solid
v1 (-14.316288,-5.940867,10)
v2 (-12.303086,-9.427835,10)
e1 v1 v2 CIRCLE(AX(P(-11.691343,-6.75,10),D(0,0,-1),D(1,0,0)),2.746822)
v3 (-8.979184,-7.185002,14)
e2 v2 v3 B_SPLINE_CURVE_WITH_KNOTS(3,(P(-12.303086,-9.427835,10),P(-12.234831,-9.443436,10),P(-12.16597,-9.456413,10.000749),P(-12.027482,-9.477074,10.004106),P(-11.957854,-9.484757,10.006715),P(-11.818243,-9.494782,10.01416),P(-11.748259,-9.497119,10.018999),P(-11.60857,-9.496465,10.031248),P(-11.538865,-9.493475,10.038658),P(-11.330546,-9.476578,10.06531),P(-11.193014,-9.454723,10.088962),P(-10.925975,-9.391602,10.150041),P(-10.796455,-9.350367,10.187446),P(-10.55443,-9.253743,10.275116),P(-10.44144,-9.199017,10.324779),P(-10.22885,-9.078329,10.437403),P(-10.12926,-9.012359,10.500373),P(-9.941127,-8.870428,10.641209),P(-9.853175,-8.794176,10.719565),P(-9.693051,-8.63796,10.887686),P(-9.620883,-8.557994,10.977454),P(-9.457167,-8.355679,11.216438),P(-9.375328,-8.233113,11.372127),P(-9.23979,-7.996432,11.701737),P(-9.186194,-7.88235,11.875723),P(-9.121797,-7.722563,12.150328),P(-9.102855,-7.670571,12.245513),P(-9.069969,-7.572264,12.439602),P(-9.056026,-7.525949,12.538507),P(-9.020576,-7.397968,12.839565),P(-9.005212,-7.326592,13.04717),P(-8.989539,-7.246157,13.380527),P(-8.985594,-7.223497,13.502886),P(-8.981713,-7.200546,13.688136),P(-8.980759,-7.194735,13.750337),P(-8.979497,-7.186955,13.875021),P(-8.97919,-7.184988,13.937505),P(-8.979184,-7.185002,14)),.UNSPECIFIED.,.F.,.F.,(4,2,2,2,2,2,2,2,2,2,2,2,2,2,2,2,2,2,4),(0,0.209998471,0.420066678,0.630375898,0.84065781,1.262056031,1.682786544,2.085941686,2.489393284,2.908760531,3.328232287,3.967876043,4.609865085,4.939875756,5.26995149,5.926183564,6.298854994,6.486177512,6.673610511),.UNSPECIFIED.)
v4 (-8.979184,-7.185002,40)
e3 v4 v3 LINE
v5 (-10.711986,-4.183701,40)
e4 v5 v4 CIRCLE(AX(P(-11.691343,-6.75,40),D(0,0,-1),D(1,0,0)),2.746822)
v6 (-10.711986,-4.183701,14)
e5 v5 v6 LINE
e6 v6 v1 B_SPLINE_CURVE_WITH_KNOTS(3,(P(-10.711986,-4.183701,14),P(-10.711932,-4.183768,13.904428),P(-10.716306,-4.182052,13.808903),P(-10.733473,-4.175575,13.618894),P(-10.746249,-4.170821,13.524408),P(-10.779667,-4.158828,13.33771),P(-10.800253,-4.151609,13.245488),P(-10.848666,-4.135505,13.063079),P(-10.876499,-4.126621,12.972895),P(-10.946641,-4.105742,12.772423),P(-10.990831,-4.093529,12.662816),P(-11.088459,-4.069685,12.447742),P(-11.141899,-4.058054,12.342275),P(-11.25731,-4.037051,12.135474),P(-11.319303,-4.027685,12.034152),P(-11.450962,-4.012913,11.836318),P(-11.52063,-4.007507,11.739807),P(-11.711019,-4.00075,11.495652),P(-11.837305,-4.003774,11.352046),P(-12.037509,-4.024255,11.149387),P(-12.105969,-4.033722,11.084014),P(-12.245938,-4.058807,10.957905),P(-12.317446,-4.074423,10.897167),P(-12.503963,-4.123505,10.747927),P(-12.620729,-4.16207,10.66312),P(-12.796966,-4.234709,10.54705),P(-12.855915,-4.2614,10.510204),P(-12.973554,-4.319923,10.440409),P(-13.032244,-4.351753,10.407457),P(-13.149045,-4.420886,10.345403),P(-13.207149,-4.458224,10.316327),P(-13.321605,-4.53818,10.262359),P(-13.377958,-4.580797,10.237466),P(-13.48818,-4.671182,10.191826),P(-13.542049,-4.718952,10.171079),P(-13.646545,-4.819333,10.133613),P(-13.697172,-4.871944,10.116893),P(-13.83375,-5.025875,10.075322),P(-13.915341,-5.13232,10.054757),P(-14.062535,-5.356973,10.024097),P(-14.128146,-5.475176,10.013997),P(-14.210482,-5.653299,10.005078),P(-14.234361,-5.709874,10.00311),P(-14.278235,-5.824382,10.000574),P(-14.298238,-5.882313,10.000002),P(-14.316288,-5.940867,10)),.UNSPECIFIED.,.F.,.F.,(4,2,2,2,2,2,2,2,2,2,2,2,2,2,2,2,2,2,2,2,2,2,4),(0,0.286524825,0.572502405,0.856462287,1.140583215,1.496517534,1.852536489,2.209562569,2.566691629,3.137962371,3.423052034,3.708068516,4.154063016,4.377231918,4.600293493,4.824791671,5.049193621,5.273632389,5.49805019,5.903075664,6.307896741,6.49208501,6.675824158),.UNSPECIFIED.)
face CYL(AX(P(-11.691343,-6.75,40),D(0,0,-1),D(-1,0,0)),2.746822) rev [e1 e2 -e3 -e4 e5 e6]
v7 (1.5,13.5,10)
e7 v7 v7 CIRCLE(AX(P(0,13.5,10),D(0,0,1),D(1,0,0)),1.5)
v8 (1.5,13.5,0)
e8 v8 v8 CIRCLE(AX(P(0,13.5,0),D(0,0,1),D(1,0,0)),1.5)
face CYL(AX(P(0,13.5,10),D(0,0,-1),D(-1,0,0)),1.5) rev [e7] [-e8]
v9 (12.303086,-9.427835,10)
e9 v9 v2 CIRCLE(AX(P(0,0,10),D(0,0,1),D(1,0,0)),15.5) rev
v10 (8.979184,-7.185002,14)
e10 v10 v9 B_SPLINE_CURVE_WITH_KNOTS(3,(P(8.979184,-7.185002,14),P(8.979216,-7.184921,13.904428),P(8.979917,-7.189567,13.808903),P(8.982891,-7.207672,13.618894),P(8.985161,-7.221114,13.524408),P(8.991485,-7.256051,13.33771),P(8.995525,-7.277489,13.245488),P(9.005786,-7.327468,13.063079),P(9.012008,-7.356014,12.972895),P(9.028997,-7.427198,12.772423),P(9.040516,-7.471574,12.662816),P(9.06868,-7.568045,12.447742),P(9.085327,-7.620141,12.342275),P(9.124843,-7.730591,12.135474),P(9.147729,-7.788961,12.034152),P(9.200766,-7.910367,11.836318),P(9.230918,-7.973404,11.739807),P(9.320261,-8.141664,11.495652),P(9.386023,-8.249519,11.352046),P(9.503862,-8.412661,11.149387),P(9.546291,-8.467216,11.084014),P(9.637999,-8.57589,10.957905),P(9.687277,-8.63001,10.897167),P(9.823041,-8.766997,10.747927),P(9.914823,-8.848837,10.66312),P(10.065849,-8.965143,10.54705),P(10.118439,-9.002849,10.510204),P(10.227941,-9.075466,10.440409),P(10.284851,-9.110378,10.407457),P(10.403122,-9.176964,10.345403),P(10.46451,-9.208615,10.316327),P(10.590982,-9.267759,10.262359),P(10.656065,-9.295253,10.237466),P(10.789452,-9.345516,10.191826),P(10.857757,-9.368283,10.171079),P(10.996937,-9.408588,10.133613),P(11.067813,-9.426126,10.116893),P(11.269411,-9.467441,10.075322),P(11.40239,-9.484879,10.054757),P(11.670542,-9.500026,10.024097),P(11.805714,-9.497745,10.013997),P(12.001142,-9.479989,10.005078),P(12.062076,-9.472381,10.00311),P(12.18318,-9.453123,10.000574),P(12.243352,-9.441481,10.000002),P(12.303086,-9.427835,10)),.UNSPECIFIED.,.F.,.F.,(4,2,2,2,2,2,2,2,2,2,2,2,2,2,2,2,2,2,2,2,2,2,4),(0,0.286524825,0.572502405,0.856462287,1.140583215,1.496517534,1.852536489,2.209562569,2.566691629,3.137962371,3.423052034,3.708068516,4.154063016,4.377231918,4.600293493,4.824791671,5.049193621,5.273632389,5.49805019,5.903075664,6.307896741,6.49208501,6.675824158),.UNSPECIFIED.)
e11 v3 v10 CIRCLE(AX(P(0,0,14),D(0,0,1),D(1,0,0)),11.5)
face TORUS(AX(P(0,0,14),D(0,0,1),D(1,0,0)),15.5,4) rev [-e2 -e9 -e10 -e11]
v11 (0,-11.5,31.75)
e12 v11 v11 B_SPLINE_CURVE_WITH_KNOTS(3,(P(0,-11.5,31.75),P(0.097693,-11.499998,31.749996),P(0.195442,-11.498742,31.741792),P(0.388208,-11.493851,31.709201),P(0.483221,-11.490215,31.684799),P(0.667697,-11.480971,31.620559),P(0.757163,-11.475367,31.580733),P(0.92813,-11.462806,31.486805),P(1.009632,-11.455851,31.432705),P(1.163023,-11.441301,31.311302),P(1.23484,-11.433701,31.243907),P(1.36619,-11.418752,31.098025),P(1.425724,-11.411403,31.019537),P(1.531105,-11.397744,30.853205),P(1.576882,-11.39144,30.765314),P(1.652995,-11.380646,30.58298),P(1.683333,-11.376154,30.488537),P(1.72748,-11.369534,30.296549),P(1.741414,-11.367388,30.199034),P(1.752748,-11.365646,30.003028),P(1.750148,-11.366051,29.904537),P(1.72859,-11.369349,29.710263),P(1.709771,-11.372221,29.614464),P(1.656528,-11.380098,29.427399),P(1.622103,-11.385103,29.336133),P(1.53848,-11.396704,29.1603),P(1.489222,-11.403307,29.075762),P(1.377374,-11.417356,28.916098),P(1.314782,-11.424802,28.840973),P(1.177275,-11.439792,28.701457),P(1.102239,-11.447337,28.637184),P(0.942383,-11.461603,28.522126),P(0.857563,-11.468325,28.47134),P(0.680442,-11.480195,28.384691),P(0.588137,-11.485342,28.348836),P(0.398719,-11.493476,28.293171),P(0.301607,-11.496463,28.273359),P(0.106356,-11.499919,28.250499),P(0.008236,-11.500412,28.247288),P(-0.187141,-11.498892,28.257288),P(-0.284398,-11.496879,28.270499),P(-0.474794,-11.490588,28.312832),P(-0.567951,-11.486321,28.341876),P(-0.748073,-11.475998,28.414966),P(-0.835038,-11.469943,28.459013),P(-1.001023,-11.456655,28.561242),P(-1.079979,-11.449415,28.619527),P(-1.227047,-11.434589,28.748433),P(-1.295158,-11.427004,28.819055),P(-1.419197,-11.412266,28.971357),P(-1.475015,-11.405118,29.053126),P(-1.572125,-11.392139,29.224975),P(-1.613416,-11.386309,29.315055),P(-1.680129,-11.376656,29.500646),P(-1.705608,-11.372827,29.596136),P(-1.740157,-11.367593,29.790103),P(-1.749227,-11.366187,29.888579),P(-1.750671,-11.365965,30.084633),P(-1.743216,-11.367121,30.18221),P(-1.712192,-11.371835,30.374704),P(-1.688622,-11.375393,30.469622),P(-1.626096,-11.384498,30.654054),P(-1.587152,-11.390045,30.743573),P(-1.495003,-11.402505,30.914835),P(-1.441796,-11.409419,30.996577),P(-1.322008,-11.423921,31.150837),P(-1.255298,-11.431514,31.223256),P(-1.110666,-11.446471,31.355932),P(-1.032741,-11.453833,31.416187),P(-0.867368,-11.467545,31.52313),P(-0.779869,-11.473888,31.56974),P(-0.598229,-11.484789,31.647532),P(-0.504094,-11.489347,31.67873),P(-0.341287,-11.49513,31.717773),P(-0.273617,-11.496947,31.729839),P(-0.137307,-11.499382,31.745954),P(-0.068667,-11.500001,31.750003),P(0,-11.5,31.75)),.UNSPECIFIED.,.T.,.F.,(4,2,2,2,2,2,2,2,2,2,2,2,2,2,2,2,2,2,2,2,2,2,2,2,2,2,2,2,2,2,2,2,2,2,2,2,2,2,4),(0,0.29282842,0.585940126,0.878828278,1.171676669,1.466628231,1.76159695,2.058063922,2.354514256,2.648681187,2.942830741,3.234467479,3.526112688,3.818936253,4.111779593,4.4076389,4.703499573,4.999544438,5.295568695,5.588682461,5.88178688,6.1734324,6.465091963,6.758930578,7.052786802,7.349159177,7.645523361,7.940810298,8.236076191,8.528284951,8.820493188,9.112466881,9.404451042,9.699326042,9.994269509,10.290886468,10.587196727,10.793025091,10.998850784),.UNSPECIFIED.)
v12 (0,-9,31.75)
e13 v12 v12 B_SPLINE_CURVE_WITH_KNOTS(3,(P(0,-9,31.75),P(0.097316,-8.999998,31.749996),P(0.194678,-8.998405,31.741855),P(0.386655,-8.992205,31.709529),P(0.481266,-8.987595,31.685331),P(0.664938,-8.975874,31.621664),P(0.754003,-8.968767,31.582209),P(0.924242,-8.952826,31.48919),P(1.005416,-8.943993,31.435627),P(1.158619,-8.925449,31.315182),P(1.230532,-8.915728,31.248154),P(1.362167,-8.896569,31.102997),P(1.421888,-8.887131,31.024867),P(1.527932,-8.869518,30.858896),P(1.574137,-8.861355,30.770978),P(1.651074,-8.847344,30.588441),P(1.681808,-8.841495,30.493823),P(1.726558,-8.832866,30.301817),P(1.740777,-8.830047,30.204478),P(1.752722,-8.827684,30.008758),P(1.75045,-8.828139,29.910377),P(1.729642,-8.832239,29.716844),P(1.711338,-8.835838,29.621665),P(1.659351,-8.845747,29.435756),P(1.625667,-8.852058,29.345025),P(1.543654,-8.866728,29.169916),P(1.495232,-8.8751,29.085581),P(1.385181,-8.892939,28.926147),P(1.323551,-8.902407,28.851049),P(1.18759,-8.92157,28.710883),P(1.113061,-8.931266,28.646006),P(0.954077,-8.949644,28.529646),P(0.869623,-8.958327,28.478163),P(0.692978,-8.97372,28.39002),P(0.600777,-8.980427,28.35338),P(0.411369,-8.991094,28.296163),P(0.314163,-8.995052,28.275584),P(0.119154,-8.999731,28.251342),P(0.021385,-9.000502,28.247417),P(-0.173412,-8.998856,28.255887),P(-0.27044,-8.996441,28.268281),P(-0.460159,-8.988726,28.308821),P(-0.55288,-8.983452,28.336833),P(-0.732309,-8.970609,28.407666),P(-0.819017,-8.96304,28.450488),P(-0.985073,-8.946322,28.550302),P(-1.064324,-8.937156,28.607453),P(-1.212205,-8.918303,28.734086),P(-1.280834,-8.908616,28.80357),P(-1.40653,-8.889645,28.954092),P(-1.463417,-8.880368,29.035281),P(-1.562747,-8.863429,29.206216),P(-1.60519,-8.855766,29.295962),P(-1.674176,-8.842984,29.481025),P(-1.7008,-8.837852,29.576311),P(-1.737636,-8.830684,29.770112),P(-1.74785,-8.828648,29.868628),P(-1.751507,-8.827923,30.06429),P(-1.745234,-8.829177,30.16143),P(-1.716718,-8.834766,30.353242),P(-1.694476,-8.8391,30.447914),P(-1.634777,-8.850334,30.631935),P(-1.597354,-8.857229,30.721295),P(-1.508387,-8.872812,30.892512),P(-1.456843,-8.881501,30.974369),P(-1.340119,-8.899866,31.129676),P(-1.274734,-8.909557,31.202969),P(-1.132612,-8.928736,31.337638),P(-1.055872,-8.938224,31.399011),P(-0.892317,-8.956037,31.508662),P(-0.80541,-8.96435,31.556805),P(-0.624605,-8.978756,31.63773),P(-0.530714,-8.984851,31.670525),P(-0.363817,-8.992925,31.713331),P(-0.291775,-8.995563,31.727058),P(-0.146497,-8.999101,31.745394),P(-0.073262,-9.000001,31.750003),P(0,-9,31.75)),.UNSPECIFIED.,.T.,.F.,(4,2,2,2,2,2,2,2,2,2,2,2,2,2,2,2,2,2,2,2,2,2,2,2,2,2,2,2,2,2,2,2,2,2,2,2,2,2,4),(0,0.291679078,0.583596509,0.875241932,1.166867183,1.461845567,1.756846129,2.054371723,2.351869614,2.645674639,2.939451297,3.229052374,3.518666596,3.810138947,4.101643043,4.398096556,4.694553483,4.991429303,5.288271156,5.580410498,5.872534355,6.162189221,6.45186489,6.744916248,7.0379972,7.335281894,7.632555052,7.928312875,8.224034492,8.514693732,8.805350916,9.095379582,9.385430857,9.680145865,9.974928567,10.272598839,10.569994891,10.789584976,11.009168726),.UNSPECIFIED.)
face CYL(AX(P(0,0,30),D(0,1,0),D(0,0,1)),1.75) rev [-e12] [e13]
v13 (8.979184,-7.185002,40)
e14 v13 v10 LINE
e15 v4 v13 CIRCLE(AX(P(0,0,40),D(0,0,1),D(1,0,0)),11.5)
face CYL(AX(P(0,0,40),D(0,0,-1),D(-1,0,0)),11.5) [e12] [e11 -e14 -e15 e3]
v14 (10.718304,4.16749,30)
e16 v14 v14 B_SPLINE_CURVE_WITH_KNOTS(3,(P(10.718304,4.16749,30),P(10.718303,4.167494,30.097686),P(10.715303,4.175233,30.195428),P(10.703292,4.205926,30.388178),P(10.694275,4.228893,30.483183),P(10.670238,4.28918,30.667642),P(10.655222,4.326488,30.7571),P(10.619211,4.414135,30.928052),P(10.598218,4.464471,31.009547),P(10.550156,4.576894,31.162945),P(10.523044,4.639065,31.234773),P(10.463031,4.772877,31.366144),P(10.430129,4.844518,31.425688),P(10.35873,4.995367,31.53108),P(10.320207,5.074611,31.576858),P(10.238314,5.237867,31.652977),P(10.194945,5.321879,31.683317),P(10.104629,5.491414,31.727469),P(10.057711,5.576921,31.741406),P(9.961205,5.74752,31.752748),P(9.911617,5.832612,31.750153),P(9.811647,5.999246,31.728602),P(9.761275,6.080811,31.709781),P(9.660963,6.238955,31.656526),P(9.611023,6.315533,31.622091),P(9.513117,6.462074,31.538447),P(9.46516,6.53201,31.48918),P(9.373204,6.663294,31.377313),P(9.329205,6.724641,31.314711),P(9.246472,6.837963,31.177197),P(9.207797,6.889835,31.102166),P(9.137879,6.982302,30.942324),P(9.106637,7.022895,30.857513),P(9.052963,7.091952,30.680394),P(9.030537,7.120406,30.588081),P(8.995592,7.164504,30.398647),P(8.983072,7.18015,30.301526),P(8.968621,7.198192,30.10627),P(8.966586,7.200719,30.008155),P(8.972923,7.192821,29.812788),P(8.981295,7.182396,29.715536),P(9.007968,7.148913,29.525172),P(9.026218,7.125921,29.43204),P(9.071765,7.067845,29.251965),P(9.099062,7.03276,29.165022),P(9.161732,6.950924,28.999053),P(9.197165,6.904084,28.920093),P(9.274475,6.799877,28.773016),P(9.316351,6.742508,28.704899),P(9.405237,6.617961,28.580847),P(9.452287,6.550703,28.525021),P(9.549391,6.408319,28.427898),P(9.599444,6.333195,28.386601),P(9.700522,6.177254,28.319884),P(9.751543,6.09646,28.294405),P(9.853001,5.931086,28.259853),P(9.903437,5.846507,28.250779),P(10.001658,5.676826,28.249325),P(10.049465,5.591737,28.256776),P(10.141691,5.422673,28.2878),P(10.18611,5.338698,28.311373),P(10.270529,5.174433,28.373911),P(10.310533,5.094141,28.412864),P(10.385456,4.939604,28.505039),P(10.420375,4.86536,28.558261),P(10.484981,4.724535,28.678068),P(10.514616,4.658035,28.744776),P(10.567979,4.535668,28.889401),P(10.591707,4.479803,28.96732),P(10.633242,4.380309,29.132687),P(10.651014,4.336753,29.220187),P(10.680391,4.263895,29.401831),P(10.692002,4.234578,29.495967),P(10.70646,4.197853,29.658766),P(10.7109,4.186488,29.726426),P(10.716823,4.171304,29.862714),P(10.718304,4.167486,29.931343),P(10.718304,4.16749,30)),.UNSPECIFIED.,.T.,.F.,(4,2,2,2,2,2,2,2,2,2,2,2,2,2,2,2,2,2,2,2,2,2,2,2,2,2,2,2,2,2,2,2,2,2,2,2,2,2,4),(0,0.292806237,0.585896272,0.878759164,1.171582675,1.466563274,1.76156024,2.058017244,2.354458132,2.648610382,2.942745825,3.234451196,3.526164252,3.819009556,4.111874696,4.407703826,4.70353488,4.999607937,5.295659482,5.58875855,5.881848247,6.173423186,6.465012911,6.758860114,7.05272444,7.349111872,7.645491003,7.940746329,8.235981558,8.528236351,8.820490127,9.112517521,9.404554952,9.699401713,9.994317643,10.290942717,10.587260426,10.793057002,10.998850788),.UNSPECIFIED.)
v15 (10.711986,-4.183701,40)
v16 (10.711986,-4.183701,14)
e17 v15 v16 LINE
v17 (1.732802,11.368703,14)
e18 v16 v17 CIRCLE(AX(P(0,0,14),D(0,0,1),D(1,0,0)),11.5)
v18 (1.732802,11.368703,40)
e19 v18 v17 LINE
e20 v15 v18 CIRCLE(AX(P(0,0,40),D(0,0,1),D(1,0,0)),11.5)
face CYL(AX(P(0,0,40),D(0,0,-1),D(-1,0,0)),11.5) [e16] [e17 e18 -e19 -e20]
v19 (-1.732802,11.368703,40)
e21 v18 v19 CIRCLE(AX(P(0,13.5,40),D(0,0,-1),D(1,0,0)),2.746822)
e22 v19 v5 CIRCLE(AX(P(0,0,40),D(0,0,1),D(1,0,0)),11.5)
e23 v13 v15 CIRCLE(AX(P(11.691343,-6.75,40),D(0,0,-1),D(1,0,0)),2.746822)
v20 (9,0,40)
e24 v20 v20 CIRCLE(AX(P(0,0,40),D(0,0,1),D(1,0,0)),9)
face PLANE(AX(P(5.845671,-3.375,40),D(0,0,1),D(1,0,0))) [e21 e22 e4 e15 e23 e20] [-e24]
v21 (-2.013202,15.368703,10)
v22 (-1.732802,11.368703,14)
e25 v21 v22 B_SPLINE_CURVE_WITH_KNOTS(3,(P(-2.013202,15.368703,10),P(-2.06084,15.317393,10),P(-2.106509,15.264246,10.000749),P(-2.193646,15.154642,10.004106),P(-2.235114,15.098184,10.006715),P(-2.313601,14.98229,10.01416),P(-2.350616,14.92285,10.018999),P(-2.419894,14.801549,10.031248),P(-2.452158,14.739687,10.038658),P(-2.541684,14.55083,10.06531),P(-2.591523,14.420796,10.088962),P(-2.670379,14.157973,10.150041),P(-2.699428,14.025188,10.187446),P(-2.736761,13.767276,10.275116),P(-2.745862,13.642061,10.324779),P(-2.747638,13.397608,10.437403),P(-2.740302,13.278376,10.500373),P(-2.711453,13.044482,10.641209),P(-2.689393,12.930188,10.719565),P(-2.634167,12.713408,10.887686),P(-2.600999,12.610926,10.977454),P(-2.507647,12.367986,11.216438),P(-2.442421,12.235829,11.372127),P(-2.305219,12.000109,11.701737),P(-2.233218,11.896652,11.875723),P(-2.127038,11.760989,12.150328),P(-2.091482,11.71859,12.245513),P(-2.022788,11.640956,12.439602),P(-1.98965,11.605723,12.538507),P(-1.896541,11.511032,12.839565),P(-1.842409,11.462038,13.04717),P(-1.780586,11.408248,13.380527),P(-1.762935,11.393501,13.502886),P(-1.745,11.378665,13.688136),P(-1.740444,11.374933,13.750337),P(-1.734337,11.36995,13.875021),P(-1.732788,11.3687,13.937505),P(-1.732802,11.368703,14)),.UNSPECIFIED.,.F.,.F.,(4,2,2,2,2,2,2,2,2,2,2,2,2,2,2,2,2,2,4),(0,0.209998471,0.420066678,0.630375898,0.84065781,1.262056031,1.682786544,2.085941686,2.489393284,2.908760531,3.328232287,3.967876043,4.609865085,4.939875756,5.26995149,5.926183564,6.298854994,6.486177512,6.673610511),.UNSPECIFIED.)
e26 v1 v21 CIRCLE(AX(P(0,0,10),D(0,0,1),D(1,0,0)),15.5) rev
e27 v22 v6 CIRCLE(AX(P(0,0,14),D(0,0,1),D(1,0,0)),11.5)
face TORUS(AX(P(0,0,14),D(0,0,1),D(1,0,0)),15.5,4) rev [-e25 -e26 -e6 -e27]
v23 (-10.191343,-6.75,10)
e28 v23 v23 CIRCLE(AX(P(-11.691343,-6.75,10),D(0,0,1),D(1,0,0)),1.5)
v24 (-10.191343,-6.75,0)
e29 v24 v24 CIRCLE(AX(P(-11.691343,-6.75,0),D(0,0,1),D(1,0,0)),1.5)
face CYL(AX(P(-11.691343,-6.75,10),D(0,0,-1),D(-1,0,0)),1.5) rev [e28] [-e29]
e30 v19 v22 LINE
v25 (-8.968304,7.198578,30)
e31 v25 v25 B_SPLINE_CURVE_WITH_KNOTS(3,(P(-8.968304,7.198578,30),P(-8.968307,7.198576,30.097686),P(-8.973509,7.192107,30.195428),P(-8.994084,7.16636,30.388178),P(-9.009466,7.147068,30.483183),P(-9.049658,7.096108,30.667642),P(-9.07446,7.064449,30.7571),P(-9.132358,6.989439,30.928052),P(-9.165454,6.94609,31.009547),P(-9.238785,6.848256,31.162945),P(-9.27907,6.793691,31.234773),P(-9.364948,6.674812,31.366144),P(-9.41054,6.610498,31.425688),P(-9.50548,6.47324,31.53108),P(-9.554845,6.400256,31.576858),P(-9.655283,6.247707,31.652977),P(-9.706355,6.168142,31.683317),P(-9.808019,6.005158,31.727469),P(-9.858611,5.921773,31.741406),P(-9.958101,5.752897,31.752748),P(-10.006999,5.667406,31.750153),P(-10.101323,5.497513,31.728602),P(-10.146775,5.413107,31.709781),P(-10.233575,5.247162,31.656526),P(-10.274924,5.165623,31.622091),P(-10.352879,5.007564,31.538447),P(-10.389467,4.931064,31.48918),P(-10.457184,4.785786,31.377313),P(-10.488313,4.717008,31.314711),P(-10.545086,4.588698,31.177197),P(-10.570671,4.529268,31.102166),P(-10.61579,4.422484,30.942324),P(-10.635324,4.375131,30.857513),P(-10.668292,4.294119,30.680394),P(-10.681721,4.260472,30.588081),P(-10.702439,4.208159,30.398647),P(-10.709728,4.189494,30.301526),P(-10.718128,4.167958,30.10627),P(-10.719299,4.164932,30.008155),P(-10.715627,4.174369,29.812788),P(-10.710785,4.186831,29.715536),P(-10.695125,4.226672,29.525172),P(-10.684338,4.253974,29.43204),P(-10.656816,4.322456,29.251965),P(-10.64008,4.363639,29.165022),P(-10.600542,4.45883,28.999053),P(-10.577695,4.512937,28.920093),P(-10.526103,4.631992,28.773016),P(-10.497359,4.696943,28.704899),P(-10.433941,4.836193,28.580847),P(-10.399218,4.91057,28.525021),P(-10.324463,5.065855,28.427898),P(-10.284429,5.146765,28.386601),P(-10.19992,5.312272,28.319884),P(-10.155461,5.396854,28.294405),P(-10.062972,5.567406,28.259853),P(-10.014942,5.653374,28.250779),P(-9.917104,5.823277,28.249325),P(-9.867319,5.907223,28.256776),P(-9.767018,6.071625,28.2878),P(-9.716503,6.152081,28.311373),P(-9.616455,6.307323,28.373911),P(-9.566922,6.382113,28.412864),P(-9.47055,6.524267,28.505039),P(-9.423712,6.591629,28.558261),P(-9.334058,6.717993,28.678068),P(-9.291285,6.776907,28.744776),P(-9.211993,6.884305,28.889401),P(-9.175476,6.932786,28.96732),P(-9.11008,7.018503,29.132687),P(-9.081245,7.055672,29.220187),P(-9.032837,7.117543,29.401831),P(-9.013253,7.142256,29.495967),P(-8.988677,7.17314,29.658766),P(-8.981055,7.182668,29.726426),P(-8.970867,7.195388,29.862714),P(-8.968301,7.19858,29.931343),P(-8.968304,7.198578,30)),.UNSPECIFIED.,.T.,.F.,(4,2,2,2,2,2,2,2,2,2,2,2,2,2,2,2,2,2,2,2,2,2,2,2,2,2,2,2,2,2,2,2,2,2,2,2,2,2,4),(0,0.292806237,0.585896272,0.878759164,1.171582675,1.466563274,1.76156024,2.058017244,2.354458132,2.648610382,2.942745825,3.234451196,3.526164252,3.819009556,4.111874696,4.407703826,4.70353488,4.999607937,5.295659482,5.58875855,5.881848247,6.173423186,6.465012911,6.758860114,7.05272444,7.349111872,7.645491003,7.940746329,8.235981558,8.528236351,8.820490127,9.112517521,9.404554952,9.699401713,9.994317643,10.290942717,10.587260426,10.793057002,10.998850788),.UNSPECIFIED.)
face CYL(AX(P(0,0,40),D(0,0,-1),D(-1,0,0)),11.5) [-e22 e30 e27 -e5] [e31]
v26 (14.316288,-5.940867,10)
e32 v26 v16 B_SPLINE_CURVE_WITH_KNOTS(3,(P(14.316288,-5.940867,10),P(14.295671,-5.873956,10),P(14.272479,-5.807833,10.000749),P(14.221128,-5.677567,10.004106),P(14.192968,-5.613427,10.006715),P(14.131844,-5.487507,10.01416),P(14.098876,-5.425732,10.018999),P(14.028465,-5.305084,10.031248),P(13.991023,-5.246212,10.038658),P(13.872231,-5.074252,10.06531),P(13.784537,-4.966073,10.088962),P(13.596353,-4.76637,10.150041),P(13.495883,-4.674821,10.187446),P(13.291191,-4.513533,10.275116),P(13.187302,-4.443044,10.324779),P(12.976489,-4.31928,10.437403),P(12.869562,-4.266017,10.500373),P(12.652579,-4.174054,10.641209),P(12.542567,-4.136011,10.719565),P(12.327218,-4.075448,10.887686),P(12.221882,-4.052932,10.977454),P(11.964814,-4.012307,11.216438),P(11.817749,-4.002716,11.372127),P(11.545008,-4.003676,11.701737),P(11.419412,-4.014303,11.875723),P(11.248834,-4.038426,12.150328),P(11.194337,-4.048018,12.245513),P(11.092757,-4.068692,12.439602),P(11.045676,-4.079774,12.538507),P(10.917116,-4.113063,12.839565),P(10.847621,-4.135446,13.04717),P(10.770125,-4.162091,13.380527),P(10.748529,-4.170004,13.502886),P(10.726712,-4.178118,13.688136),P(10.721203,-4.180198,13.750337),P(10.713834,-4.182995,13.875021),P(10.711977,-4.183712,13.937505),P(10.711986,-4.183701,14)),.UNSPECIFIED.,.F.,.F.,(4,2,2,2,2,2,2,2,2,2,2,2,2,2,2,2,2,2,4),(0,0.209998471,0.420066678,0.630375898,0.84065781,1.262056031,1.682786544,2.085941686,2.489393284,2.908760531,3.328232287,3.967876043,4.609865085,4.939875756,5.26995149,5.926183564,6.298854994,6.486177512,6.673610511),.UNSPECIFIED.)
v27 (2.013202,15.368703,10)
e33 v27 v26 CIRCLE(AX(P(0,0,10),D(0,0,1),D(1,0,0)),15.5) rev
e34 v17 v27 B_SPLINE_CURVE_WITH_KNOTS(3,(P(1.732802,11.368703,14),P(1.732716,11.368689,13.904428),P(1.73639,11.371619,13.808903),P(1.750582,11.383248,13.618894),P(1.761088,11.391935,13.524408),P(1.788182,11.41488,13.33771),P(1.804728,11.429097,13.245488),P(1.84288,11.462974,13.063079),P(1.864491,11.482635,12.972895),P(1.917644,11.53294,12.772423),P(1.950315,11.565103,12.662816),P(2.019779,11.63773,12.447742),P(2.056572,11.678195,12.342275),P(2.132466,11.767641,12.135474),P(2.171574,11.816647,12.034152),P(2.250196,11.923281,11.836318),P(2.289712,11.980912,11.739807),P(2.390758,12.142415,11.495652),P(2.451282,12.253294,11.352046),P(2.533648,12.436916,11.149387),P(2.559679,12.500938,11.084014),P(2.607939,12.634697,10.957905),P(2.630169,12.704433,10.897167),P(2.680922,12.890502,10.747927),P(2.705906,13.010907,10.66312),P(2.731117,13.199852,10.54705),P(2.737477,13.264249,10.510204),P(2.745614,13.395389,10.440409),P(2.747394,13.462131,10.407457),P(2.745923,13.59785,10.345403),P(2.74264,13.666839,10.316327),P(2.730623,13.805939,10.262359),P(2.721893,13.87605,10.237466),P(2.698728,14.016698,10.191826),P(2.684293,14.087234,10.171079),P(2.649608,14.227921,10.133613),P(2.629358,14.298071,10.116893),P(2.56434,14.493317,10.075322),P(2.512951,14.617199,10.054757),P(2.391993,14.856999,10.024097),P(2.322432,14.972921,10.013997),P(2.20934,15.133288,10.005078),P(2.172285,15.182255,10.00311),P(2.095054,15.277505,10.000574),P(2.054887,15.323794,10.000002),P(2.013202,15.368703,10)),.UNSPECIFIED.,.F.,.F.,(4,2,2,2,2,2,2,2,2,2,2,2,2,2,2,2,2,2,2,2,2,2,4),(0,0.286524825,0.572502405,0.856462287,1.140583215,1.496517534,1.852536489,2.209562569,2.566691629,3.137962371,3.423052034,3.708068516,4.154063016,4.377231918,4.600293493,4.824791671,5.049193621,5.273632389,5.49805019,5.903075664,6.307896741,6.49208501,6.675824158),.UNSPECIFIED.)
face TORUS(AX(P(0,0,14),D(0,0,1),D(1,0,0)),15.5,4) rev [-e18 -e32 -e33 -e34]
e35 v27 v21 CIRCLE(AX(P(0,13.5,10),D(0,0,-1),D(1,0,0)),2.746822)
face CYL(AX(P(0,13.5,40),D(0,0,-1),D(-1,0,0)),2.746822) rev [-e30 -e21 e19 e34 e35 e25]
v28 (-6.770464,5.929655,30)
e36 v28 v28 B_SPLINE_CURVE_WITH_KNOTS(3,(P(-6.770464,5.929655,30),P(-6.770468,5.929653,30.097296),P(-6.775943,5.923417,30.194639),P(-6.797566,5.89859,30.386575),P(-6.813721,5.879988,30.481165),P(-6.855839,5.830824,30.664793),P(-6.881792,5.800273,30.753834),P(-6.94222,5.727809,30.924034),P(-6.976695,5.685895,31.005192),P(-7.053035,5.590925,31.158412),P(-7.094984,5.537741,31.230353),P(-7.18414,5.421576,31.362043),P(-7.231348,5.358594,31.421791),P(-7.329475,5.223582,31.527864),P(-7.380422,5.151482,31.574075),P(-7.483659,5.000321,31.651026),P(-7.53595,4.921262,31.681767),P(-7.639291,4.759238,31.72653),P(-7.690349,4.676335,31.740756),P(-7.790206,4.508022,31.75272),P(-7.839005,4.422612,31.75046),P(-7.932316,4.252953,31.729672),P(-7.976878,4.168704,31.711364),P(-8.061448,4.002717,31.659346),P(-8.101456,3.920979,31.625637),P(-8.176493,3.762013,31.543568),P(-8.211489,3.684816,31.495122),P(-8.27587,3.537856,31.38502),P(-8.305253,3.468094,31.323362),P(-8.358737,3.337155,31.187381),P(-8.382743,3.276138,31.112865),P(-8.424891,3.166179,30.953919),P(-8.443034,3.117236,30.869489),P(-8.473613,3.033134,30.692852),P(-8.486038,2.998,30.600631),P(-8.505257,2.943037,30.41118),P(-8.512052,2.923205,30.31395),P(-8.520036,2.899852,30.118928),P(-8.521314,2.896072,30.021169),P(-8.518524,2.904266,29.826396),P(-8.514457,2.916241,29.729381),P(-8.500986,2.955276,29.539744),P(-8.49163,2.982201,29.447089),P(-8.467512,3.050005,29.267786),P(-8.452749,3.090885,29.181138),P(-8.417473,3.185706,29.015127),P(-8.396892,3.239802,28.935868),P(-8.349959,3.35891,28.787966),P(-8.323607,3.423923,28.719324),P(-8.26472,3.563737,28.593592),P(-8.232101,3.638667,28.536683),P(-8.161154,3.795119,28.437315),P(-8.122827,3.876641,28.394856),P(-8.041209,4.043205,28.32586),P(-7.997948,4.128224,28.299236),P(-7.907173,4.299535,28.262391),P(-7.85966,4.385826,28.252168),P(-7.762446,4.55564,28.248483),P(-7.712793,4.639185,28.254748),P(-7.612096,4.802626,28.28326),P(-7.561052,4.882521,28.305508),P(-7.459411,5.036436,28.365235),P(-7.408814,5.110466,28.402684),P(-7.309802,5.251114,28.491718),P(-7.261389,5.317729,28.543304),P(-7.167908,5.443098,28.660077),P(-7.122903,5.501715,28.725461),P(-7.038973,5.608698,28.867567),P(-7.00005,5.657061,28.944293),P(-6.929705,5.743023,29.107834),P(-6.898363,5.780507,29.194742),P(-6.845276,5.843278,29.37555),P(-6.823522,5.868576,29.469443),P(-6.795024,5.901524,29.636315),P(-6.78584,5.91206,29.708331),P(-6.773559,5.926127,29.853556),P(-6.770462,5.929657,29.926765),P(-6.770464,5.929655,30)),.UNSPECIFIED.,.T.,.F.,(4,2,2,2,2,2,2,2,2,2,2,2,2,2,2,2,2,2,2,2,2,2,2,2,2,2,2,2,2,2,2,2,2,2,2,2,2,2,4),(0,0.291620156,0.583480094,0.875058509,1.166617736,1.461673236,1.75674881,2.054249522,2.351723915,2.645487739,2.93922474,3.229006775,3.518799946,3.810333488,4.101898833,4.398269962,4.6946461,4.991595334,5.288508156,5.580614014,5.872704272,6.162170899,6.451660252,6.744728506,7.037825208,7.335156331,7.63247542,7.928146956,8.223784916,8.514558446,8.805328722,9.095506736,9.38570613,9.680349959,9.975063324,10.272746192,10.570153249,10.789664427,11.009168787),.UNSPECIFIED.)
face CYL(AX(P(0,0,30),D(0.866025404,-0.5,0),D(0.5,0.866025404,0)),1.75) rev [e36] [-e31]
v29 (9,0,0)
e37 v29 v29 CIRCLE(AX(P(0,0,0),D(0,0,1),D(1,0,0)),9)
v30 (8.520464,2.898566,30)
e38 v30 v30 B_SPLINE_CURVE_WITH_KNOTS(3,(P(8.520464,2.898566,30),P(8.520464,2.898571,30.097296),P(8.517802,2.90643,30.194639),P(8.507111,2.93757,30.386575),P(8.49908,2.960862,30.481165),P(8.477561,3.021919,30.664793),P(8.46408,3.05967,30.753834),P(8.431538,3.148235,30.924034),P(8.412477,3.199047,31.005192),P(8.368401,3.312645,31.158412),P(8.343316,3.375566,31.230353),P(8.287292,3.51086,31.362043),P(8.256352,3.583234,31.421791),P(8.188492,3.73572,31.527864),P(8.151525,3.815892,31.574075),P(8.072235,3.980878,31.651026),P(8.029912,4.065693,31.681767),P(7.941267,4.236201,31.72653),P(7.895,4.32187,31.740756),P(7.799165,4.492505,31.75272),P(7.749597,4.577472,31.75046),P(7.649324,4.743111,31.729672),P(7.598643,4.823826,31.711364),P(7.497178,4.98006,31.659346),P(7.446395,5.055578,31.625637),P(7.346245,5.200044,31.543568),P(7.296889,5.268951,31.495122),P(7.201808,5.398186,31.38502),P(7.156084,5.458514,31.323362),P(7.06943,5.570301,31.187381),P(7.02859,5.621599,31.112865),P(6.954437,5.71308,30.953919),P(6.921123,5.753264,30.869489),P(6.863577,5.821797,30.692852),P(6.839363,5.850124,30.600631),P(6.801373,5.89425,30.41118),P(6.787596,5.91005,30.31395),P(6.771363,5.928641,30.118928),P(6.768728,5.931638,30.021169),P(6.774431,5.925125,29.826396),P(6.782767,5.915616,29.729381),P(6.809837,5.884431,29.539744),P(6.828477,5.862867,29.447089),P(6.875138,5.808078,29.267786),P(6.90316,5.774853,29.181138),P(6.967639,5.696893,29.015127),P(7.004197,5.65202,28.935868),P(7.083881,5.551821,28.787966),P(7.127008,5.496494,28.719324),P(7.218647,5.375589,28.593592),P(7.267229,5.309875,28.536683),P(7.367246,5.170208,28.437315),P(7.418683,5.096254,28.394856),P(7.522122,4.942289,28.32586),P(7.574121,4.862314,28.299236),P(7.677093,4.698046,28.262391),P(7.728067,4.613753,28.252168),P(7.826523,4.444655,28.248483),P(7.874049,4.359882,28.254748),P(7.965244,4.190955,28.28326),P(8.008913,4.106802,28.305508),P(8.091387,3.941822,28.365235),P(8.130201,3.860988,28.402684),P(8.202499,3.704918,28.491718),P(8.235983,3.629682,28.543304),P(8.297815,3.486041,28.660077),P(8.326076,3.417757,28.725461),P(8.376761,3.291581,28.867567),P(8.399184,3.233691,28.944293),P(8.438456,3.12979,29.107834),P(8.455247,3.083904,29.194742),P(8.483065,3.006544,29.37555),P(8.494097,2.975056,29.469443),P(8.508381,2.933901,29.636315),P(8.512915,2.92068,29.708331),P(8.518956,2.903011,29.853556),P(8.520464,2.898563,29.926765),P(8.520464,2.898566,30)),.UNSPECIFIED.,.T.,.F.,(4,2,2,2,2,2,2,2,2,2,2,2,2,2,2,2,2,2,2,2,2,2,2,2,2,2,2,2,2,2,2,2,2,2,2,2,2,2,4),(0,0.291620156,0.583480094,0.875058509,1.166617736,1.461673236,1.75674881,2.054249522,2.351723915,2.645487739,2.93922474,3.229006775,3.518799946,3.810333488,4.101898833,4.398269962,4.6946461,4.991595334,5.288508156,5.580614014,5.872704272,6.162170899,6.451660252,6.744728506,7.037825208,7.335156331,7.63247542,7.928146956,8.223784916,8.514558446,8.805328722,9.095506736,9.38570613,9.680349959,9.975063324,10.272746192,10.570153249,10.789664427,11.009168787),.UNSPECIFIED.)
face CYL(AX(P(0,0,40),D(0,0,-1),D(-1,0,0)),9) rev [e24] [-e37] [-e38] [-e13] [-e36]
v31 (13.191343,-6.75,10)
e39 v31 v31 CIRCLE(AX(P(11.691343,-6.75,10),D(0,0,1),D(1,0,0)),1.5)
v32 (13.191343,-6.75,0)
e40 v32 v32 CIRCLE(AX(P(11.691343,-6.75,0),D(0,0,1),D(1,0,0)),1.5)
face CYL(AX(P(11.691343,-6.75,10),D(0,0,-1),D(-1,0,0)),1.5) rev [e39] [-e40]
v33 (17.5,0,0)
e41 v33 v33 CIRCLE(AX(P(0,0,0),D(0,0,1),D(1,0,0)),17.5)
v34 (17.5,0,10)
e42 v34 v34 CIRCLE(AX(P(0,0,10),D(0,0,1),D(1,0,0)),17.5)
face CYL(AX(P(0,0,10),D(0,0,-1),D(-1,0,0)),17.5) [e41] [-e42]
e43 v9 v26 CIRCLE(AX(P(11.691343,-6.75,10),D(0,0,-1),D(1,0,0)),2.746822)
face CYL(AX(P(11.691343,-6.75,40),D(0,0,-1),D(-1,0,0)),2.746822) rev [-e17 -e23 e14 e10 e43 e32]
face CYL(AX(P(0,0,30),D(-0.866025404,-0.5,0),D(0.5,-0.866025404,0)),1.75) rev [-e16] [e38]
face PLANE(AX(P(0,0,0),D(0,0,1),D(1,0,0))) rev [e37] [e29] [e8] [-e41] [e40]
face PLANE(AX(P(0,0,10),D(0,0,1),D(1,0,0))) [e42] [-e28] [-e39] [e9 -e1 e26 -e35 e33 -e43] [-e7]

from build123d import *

# Parameters (mm, degrees)
SKETCH1_R           = 17.5
SKETCH1_R_2         = 1.5
BOSS_EXTRUDE1_DEPTH = 10
SKETCH2_R           = 9
BOSS_EXTRUDE2_DEPTH = 30
SKETCH2_2_R         = 9
CUT_EXTRUDE1_DEPTH  = 39.890872965
FILLET1_R           = 4
SKETCH4_4_W         = 1.75
SKETCH4_4_H         = 11.757944022


with BuildPart() as part:
    # Sketch1 → Boss-Extrude1 (new body)
    with BuildSketch(Plane.XY):
        Circle(SKETCH1_R)
        with Locations((0, 13.5)):
            Circle(SKETCH1_R_2, mode=Mode.SUBTRACT)
        with Locations((11.691342951, -6.75)):
            Circle(SKETCH1_R_2, mode=Mode.SUBTRACT)
        with Locations((-11.691342951, -6.75)):
            Circle(SKETCH1_R_2, mode=Mode.SUBTRACT)
    extrude(amount=BOSS_EXTRUDE1_DEPTH)

    # Sketch2 → Boss-Extrude2 (add)
    with BuildSketch(Plane.XY.offset(10)):
        with BuildLine():
            ThreePointArc((10.71198615, -4.18370084), (9.959292144, 5.75), (1.732801866, 11.368702551))
            ThreePointArc((1.732801866, 11.368702551), (0, 10.753177996), (-1.732801866, 11.368702551))
            ThreePointArc((-1.732801866, 11.368702551), (-9.959292144, 5.75), (-10.71198615, -4.18370084))
            ThreePointArc((-10.71198615, -4.18370084), (-9.312525316, -5.376588998), (-8.979184285, -7.185001711))
            ThreePointArc((-8.979184285, -7.185001711), (0, -11.5), (8.979184285, -7.185001711))
            ThreePointArc((8.979184285, -7.185001711), (9.312525316, -5.376588998), (10.71198615, -4.18370084))
        make_face()
        Circle(SKETCH2_R, mode=Mode.SUBTRACT)
    extrude(amount=BOSS_EXTRUDE2_DEPTH)

    # Sketch2<2> → Cut-Extrude1 (cut, through all)
    with BuildSketch(Plane.XY.offset(10)):
        Circle(SKETCH2_2_R)
    extrude(amount=-CUT_EXTRUDE1_DEPTH, mode=Mode.SUBTRACT)

    # Fillet1
    # the kernel refuses this fillet: 4 mm, written as the material it adds along each edge
    with BuildSketch(Plane(origin=(0, 0, 10), x_dir=(-0.9810153845306142, 0.19392992372053186, 0), z_dir=(0.19392992372053186, 0.9810153845306142, 0))) as fillet1_piece_1_section:
        with BuildLine():
            CenterArc((11.5 + FILLET1_R, FILLET1_R), FILLET1_R, 180, 90)
            Line((11.5, FILLET1_R), (11.5, 0))
            Line((11.5, 0), (11.5 + FILLET1_R, 0))
        make_face()
    fillet1_piece_1 = revolve(axis=Axis((0, 0, 10), (0, 0, 1)), revolution_arc=202.364438996, mode=Mode.PRIVATE)
    fillet1_piece_1 = fillet1_piece_1 - Plane(origin=(11.691342951, -6.75, 10.886663102), x_dir=(-0.9873805666072768, -0.15836545294442564, 0), z_dir=(0, 0, -1)) * Cylinder(2.746822004, 62, mode=Mode.PRIVATE)
    fillet1_piece_1 = fillet1_piece_1 - Plane(origin=(-11.691342951, -6.75, 10.886663102), x_dir=(0.3565417779714824, 0.9342793803573609, 0), z_dir=(0, 0, -1)) * Cylinder(2.746822004, 62, mode=Mode.PRIVATE)
    add(fillet1_piece_1)
    with BuildSketch(Plane(origin=(0, 0, 10), x_dir=(0.3225594517692616, -0.9465492063671669, 0), z_dir=(-0.9465492063671669, -0.3225594517692616, 0))) as fillet1_piece_2_section:
        with BuildLine():
            CenterArc((11.5 + FILLET1_R, FILLET1_R), FILLET1_R, 180, 90)
            Line((11.5, FILLET1_R), (11.5, 0))
            Line((11.5, 0), (11.5 + FILLET1_R, 0))
        make_face()
    fillet1_piece_2 = revolve(axis=Axis((0, 0, 10), (0, 0, 1)), revolution_arc=202.364438996, mode=Mode.PRIVATE)
    fillet1_piece_2 = fillet1_piece_2 - Plane(origin=(11.691342951, -6.75, 10.886663102), x_dir=(-0.9873805666072768, -0.15836545294442564, 0), z_dir=(0, 0, -1)) * Cylinder(2.746822004, 62, mode=Mode.PRIVATE)
    fillet1_piece_2 = fillet1_piece_2 - Plane(origin=(0, 13.5, 10.886663102), x_dir=(0.6308387886354789, -0.7759139274126491, 0), z_dir=(0, 0, -1)) * Cylinder(2.746822004, 62, mode=Mode.PRIVATE)
    add(fillet1_piece_2)
    with BuildSketch(Plane(origin=(0, 0, 10), x_dir=(0.6584559327613483, 0.7526192826465335, 0), z_dir=(0.7526192826465335, -0.6584559327613483, 0))) as fillet1_piece_3_section:
        with BuildLine():
            CenterArc((11.5 + FILLET1_R, FILLET1_R), FILLET1_R, 180, 90)
            Line((11.5, FILLET1_R), (11.5, 0))
            Line((11.5, 0), (11.5 + FILLET1_R, 0))
        make_face()
    fillet1_piece_3 = revolve(axis=Axis((0, 0, 10), (0, 0, 1)), revolution_arc=202.364438996, mode=Mode.PRIVATE)
    fillet1_piece_3 = fillet1_piece_3 - Plane(origin=(0, 13.5, 10.886663102), x_dir=(0.6308387886354789, -0.7759139274126491, 0), z_dir=(0, 0, -1)) * Cylinder(2.746822004, 63, mode=Mode.PRIVATE)
    fillet1_piece_3 = fillet1_piece_3 - Plane(origin=(-11.691342951, -6.75, 10.886663102), x_dir=(0.3565417779714824, 0.9342793803573609, 0), z_dir=(0, 0, -1)) * Cylinder(2.746822004, 63, mode=Mode.PRIVATE)
    add(fillet1_piece_3)

    # Sketch4 → Cut-Revolve1 (revolve, cut)
    with BuildSketch(Plane.XY.offset(30), mode=Mode.PRIVATE) as cut_revolve1_sk:
        Polygon((-16.858526531, 9.733274831), (-6.675848312, 3.85430282), (-7.550848312, 2.338758363), (-17.733526531, 8.217730374), align=None)
    revolve(cut_revolve1_sk.sketch.rotate(Axis((0, 0, 30), (-0.8660254037844364, 0.5000000000000039, 0)), 180), axis=Axis((0, 0, 30), (-0.8660254037844364, 0.5000000000000039, 0)), mode=Mode.SUBTRACT)

    # Sketch4<3> → Cut-Revolve2 (revolve, cut)
    with BuildSketch(Plane.XY.offset(30), mode=Mode.PRIVATE) as cut_revolve2_sk:
        Polygon((15.983526531, 11.248819288), (16.858526531, 9.733274831), (6.675848312, 3.85430282), (5.800848312, 5.369847276), align=None)
    revolve(cut_revolve2_sk.sketch.rotate(Axis((0, 0, 30), (0.8660254037844362, 0.5000000000000044, 0)), 180), axis=Axis((0, 0, 30), (0.8660254037844362, 0.5000000000000044, 0)), mode=Mode.SUBTRACT)

    # Sketch4<4> → Cut-Revolve3 (revolve, cut)
    with BuildSketch(Plane.XY.offset(30), mode=Mode.PRIVATE) as cut_revolve3_sk:
        with Locations((0.875, -13.587577651)):
            Rectangle(SKETCH4_4_W, SKETCH4_4_H)
    revolve(cut_revolve3_sk.sketch.rotate(Axis((0, 0, 30), (0, -1, 0)), 90), axis=Axis((0, 0, 30), (0, -1, 0)), mode=Mode.SUBTRACT)


solid = part.part
